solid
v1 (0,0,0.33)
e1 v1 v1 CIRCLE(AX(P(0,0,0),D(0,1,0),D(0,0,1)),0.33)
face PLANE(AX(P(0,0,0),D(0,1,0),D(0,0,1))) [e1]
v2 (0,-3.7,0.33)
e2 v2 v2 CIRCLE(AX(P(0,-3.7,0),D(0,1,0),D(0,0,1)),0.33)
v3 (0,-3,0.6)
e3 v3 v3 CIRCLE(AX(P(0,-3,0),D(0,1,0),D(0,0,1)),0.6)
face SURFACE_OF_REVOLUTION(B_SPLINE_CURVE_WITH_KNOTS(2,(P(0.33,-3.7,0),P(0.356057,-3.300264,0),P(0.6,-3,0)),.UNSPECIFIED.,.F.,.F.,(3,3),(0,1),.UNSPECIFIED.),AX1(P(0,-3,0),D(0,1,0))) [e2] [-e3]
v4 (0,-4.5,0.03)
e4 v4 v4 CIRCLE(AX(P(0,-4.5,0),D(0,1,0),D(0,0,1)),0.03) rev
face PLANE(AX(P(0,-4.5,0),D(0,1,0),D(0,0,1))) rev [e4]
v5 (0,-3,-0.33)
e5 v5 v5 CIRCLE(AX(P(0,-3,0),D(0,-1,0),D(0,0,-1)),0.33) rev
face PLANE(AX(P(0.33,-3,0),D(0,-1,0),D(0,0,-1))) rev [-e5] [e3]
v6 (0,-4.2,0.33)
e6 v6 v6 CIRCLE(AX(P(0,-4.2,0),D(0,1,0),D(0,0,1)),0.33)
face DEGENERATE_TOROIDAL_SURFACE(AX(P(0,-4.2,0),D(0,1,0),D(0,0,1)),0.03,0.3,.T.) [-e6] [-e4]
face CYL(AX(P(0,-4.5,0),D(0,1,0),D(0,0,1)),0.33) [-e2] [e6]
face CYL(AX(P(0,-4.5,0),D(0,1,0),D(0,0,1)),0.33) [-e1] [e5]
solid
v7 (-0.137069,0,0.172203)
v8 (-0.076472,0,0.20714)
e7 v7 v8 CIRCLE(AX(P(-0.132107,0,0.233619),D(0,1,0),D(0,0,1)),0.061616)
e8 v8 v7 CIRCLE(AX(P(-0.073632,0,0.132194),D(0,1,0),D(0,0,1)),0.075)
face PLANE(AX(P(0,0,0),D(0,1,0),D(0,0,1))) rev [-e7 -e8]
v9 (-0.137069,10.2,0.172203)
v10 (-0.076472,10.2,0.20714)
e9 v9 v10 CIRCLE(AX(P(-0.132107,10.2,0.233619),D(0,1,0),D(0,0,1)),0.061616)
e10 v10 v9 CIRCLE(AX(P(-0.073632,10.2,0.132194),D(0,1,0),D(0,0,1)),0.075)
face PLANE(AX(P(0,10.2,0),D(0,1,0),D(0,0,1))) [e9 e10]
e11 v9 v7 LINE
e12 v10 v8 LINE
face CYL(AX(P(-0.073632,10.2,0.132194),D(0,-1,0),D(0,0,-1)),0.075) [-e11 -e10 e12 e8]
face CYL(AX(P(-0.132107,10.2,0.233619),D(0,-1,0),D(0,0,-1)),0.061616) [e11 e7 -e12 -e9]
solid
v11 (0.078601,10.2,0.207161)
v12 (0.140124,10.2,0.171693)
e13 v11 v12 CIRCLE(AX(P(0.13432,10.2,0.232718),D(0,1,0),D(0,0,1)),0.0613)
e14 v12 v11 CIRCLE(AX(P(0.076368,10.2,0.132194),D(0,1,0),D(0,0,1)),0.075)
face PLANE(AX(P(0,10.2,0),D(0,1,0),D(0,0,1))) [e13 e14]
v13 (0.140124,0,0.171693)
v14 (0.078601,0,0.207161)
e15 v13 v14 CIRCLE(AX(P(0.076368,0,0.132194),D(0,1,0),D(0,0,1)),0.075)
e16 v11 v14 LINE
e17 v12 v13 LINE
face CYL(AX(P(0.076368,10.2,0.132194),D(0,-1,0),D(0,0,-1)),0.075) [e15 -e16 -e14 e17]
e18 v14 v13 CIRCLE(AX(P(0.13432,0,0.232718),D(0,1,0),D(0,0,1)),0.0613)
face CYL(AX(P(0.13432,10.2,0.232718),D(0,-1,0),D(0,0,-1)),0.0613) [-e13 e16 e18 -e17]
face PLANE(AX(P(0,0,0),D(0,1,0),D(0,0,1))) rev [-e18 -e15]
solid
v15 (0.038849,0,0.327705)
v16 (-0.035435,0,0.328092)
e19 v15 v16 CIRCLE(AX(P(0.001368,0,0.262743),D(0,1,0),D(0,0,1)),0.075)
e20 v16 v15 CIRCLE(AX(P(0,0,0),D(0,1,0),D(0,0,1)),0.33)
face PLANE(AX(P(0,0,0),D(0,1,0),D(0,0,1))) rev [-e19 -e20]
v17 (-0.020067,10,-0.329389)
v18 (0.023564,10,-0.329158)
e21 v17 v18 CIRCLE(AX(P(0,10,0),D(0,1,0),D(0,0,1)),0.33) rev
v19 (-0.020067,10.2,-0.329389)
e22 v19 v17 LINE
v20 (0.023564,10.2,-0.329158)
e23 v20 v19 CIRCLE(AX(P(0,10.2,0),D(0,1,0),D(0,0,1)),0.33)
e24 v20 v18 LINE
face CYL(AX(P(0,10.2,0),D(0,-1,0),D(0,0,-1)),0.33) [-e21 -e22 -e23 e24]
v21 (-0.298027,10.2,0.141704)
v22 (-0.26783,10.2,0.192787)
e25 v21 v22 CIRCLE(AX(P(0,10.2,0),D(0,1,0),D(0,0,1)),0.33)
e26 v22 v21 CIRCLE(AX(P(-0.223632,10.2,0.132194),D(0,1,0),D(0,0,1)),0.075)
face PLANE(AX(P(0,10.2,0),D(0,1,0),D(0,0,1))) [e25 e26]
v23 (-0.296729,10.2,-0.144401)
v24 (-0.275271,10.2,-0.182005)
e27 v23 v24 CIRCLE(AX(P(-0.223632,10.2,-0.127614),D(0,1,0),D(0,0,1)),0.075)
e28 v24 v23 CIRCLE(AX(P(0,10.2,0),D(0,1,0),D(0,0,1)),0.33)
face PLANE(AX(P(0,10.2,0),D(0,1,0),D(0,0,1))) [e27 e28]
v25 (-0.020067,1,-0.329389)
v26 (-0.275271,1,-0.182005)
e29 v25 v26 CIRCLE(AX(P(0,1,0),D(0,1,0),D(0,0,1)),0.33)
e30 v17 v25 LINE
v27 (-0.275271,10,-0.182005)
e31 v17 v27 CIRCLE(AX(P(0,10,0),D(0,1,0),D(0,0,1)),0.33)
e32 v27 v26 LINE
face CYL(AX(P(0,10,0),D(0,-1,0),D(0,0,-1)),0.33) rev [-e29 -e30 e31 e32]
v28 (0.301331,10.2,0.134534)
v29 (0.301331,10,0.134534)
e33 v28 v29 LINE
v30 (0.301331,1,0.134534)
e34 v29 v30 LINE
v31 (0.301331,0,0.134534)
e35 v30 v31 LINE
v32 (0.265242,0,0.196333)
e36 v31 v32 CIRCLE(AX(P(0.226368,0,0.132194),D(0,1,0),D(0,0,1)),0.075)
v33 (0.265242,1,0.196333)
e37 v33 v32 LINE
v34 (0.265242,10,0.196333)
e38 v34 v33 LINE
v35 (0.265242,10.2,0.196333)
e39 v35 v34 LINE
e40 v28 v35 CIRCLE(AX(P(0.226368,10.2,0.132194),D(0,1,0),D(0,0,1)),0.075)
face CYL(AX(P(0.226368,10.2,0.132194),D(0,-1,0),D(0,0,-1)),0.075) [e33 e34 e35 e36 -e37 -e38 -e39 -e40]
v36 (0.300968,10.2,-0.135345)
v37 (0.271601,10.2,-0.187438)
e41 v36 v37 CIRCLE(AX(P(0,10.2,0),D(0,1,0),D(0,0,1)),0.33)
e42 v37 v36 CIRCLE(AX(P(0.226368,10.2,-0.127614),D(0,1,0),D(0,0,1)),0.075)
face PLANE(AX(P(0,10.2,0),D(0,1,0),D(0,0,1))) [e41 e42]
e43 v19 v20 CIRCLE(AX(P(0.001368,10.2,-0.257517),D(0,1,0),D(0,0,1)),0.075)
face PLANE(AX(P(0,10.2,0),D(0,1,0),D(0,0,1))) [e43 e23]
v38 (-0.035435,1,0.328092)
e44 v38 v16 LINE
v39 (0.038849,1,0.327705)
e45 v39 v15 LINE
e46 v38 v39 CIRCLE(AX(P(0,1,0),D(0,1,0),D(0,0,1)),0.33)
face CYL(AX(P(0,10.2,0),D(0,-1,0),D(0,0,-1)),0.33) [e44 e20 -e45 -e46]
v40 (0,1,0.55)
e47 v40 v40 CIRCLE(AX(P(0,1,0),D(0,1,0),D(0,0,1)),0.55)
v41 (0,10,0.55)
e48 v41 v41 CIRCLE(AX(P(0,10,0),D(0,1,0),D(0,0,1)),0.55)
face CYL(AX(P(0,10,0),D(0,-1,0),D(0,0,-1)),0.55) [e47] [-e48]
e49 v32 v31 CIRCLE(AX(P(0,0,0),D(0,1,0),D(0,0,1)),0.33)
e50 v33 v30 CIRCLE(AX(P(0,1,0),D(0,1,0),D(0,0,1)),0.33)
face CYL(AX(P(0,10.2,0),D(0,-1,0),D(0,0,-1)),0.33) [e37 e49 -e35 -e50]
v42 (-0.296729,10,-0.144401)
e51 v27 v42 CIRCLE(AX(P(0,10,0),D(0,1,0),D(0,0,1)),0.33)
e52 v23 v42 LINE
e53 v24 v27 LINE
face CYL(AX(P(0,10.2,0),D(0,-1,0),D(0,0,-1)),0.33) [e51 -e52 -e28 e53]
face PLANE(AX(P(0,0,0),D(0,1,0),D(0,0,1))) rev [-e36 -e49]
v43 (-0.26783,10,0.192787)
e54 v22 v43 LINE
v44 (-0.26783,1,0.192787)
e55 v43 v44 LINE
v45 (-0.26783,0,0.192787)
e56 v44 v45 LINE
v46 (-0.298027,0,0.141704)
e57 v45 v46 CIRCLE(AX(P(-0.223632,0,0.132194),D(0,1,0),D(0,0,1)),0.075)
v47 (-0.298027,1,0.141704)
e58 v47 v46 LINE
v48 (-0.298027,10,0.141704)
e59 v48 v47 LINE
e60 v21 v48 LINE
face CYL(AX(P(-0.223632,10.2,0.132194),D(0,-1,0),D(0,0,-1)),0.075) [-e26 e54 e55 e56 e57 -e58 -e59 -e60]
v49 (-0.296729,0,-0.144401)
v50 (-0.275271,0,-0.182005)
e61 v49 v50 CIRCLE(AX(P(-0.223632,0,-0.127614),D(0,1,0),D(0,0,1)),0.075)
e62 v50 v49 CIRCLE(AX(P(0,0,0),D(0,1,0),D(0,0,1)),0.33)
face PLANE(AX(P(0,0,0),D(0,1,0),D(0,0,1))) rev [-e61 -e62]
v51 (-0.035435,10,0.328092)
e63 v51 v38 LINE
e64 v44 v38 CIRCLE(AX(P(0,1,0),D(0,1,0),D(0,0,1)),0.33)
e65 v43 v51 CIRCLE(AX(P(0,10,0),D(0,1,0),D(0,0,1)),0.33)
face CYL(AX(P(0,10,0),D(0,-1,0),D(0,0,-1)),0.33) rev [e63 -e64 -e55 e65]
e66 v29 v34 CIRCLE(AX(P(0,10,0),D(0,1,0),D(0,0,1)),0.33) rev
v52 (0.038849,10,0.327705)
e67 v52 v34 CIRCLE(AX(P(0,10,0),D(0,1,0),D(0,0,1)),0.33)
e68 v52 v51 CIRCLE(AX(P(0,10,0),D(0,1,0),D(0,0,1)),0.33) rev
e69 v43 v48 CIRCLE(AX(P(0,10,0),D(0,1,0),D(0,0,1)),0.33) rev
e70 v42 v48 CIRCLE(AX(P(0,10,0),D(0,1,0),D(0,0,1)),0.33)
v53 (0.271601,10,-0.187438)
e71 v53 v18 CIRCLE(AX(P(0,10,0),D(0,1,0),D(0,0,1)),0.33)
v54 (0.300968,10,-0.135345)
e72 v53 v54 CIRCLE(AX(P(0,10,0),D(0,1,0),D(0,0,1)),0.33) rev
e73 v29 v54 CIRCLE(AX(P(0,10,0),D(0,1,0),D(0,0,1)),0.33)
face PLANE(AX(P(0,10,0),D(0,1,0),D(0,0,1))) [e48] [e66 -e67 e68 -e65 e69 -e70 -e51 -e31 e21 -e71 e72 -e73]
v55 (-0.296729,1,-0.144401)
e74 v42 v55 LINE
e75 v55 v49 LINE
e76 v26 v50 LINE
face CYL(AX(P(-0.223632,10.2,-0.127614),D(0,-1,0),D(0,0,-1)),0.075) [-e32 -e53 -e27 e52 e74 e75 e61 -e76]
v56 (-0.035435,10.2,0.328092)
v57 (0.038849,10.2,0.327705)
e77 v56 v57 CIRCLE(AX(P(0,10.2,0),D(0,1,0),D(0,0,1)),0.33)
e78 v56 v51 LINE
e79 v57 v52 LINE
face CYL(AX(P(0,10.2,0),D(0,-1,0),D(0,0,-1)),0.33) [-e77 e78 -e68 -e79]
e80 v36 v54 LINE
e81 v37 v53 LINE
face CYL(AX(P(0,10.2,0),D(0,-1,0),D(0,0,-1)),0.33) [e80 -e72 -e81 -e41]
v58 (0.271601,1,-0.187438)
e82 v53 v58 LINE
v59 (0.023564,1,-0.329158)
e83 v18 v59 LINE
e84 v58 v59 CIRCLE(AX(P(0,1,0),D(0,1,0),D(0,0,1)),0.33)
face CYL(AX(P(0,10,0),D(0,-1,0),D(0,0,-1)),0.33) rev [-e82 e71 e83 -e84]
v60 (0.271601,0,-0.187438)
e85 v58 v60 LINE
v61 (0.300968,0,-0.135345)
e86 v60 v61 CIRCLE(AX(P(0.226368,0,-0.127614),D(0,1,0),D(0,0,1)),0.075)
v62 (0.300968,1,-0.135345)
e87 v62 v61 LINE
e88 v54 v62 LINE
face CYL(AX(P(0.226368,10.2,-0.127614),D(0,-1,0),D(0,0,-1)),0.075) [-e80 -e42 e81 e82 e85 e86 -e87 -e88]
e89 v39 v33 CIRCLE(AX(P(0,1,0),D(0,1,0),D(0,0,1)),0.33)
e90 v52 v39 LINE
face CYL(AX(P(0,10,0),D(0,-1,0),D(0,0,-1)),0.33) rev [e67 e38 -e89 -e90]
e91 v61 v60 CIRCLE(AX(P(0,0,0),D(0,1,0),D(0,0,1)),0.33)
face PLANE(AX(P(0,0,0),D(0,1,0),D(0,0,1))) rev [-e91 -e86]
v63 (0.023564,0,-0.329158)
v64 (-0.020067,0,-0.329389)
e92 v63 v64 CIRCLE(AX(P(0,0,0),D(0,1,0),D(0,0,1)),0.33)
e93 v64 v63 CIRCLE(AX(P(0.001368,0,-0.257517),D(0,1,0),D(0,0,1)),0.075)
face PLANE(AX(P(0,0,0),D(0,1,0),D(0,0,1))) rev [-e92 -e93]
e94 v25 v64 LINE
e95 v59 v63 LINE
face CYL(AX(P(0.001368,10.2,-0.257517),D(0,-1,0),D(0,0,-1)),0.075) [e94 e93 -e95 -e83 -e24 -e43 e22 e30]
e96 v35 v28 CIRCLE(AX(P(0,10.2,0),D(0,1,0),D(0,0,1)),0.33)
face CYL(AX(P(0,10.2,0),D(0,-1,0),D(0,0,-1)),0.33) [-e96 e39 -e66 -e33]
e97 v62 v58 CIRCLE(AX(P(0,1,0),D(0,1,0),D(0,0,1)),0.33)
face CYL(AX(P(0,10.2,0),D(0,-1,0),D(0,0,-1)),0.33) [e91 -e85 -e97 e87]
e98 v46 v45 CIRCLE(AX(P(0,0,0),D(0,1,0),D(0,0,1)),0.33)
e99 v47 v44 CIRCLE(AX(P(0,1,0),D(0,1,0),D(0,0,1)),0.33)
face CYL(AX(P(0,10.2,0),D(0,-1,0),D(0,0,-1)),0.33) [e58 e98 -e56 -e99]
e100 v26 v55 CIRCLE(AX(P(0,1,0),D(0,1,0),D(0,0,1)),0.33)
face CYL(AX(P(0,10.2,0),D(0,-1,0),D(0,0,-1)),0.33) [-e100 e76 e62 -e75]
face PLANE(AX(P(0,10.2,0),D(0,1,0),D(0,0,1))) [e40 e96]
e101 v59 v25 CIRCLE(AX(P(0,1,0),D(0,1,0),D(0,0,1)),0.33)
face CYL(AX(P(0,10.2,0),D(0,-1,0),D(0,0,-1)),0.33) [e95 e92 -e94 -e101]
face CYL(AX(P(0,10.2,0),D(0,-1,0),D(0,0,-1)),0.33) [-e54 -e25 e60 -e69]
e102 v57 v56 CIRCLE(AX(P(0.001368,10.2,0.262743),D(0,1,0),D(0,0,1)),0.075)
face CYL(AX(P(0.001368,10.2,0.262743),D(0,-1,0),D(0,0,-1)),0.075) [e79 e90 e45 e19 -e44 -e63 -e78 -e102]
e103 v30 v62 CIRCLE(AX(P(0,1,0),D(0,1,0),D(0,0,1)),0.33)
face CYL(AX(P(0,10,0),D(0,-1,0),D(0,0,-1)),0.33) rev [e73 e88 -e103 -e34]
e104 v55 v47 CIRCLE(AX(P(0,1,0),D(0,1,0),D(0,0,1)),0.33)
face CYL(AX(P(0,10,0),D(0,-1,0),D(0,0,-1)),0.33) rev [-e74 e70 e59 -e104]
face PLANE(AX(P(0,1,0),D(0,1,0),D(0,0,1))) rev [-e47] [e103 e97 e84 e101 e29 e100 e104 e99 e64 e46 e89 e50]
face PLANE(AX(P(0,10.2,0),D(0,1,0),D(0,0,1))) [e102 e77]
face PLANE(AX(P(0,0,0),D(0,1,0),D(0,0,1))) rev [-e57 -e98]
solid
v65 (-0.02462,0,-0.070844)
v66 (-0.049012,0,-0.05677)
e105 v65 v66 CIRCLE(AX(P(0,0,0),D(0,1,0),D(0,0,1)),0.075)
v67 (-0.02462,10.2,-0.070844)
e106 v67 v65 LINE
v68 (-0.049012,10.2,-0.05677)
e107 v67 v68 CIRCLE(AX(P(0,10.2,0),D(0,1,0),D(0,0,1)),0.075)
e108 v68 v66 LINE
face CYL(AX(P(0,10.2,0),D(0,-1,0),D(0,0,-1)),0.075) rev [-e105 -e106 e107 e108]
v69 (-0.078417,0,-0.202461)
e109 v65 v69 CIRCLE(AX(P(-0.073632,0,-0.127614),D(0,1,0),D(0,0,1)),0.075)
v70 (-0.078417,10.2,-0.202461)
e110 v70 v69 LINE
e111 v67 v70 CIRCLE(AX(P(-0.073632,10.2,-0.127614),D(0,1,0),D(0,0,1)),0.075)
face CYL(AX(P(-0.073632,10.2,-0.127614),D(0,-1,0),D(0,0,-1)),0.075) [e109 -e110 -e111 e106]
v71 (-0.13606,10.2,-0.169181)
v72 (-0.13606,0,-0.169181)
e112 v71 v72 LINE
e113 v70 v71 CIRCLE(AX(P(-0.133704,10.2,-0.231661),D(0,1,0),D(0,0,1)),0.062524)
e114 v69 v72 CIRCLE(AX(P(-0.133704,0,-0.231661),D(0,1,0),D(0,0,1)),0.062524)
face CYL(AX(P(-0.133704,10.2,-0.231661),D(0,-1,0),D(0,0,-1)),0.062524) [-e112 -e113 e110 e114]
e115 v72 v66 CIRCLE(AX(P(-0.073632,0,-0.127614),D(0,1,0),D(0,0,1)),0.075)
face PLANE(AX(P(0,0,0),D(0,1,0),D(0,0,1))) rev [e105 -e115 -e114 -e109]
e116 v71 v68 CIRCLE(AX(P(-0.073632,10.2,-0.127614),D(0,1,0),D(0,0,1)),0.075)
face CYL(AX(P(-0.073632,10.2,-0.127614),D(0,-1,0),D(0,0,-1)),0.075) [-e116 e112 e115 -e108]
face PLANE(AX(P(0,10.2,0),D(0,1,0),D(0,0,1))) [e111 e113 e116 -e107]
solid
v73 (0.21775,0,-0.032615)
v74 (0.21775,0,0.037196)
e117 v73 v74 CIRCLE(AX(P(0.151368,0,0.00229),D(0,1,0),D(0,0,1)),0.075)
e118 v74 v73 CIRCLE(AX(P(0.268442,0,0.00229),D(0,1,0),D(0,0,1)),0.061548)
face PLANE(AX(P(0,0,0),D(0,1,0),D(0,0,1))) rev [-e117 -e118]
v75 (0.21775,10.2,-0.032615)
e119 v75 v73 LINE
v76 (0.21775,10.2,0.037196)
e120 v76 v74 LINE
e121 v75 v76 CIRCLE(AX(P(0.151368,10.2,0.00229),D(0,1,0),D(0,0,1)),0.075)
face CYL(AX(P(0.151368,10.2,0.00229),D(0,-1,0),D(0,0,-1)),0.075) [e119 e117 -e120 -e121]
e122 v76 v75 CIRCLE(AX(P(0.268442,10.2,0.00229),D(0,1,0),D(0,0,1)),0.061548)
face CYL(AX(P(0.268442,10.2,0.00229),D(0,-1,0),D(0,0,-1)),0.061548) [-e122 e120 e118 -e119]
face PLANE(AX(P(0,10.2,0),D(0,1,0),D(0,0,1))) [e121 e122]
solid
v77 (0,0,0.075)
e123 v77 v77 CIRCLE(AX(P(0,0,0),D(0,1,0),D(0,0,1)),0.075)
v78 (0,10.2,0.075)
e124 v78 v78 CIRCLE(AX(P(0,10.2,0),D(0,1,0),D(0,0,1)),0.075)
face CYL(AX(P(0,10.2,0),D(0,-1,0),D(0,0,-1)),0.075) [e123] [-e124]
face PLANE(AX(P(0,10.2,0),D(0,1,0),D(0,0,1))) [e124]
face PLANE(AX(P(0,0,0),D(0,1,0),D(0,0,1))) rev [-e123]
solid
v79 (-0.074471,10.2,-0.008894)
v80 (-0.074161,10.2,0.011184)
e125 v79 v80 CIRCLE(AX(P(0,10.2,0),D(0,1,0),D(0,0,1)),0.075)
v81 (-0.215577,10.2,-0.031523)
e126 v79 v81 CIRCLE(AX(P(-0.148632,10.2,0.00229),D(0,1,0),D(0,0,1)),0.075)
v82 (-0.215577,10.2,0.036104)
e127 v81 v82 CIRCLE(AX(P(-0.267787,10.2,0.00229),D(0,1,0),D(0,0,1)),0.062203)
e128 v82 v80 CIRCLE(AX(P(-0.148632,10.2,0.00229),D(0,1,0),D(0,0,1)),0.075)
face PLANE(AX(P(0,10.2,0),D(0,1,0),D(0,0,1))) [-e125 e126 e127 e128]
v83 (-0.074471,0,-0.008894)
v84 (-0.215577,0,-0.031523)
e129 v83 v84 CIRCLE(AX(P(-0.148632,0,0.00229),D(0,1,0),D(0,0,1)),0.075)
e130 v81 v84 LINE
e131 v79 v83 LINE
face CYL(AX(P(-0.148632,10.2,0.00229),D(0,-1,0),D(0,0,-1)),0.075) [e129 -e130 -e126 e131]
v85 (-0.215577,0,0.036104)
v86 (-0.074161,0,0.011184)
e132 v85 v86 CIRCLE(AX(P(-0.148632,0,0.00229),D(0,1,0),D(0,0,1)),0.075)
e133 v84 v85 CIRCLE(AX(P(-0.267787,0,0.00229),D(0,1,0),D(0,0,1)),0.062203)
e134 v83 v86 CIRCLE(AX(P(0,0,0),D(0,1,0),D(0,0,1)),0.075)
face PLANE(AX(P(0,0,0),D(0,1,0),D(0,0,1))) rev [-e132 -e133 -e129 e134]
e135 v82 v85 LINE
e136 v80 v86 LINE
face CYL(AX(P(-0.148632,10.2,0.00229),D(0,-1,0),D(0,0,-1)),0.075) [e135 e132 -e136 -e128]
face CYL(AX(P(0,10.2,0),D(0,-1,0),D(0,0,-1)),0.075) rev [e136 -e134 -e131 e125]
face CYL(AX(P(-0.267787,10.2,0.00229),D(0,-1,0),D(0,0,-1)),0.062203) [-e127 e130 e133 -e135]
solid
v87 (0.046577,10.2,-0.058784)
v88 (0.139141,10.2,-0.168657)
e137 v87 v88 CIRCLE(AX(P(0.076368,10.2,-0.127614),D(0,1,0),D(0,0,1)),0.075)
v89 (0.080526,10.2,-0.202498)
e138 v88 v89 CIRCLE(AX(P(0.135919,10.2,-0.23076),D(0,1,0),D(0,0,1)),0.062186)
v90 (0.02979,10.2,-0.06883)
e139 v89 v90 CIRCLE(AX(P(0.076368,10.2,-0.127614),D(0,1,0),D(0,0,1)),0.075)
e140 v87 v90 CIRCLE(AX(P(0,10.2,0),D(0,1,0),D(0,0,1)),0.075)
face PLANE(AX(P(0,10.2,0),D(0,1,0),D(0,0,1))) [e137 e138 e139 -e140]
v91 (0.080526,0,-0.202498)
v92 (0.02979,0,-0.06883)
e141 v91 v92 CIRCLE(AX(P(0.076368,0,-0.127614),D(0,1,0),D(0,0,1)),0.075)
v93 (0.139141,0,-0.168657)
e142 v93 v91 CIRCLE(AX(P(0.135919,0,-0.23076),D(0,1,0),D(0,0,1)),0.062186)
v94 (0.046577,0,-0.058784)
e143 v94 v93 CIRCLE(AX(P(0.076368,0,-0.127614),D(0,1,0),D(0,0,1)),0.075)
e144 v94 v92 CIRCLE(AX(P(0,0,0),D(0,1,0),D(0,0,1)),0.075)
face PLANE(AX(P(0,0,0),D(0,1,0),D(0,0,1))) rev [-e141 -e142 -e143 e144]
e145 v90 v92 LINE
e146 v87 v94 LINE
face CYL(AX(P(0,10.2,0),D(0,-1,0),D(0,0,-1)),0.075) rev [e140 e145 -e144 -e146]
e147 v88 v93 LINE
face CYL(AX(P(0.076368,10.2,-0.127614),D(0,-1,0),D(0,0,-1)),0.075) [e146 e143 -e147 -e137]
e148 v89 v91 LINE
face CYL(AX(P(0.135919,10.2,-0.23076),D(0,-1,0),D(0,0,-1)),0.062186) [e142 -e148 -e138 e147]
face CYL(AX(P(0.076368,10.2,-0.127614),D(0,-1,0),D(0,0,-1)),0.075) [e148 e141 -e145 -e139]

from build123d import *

# Parameters (mm, degrees)
EXTRUDE_2_OUTLINE_R = 0.075
EXTRUDE_2_DEPTH     = 10.2
EXTRUDE_2_2_DEPTH   = 10.2
EXTRUDE_2_3_DEPTH   = 10.2
EXTRUDE_2_4_DEPTH   = 10.2
EXTRUDE_2_5_DEPTH   = 10.2
EXTRUDE_2_6_DEPTH   = 10.2
EXTRUDE_2_7_DEPTH   = 10.2
EXTRUDE_2_8_DEPTH   = 10.2
EXTRUDE_2_9_DEPTH   = 10.2
EXTRUDE_2_10_DEPTH  = 10.2
EXTRUDE_2_11_DEPTH  = 10.2
EXTRUDE_2_12_DEPTH  = 10.2
EXTRUDE_2_13_DEPTH  = 10.2
EXTRUDE_5_DEPTH     = 4.5
EXTRUDE_START       = 1
SKETCH_3_R          = 0.55
SKETCH_3_R_2        = 0.33
EXTRUDE_6_DEPTH     = 9
FILLET_3_R          = 0.3


# Read off the part's stored shape, not the designer's step: Бобышка-Вытянуть2
with BuildPart() as part:
    # Бобышка-Вытянуть2 outline → Бобышка-Вытянуть2 (new body)
    with BuildSketch(Plane(origin=(0, 0, 0), x_dir=(1, 0, 0), z_dir=(0, 1, 0))):
        Circle(EXTRUDE_2_OUTLINE_R)
    extrude(amount=EXTRUDE_2_DEPTH)


with BuildPart() as body_2:
    # Extrude 2 2 outline → Extrude 2 2 (new body)
    with BuildSketch(Plane(origin=(0, 0, 0), x_dir=(1, 0, 0), z_dir=(0, 1, 0))):
        with BuildLine():
            ThreePointArc((-0.215577435, 0.031523255), (-0.329990207, -0.00229018), (-0.215577435, -0.036103616))
            ThreePointArc((-0.215577435, -0.036103616), (-0.135616584, -0.076152155), (-0.074161469, -0.011183762))
            ThreePointArc((-0.074161469, -0.011183762), (-0.074991098, -0.00115549), (-0.074470828, 0.008893581))
            ThreePointArc((-0.074470828, 0.008893581), (-0.136756085, 0.071763554), (-0.215577435, 0.031523255))
        make_face()
    extrude(amount=EXTRUDE_2_2_DEPTH)



with BuildPart() as body_3:
    # Extrude 2 3 outline → Extrude 2 3 (new body)
    with BuildSketch(Plane(origin=(0, 0, 0), x_dir=(1, 0, 0), z_dir=(0, 1, 0))):
        with BuildLine():
            ThreePointArc((-0.078416857, 0.202460861), (-0.164965898, 0.285808068), (-0.13605962, 0.169180796))
            ThreePointArc((-0.13605962, 0.169180796), (-0.132931564, 0.081694169), (-0.049012134, 0.056769805))
            ThreePointArc((-0.049012134, 0.056769805), (-0.03748264, 0.064961925), (-0.024620163, 0.070843825))
            ThreePointArc((-0.024620163, 0.070843825), (-0.004207657, 0.155990018), (-0.078416857, 0.202460861))
        make_face()
    extrude(amount=EXTRUDE_2_3_DEPTH)


with BuildPart() as body_4:
    # Extrude 2 4 outline → Extrude 2 4 (new body)
    with BuildSketch(Plane(origin=(0, 0, 0), x_dir=(1, 0, 0), z_dir=(0, 1, 0))):
        with BuildLine():
            ThreePointArc((0.139140572, 0.168657106), (0.167012389, 0.284614831), (0.080525962, 0.202498267))
            ThreePointArc((0.080525962, 0.202498267), (0.006248792, 0.154228257), (0.029790206, 0.068829817))
            ThreePointArc((0.029790206, 0.068829817), (0.038512817, 0.06435653), (0.046577497, 0.058783813))
            ThreePointArc((0.046577497, 0.058783813), (0.133726217, 0.079291783), (0.139140572, 0.168657106))
        make_face()
    extrude(amount=EXTRUDE_2_4_DEPTH)


with BuildPart() as body_5:
    # Extrude 2 5 outline → Extrude 2 5 (new body)
    with BuildSketch(Plane(origin=(0, 0, 0), x_dir=(1, 0, 0), z_dir=(0, 1, 0))):
        with BuildLine():
            ThreePointArc((0.217749972, -0.037195687), (0.329990231, -0.002290181), (0.217749972, 0.032615326))
            ThreePointArc((0.217749972, 0.032615326), (0.076367703, -0.00229018), (0.217749972, -0.037195687))
        make_face()
    extrude(amount=EXTRUDE_2_5_DEPTH)


with BuildPart() as body_6:
    # Extrude 2 6 outline → Extrude 2 6 (new body)
    with BuildSketch(Plane(origin=(0, 0, 0), x_dir=(1, 0, 0), z_dir=(0, 1, 0))):
        with BuildLine():
            ThreePointArc((0.078601287, -0.207160724), (0.164936529, -0.285825011), (0.140123873, -0.171692736))
            ThreePointArc((0.140123873, -0.171692736), (0.038908974, -0.067218275), (0.078601287, -0.207160724))
        make_face()
    extrude(amount=EXTRUDE_2_6_DEPTH)


with BuildPart() as body_7:
    # Extrude 2 7 outline → Extrude 2 7 (new body)
    with BuildSketch(Plane(origin=(0, 0, 0), x_dir=(1, 0, 0), z_dir=(0, 1, 0))):
        with BuildLine():
            ThreePointArc((-0.137069196, -0.172203487), (-0.162882691, -0.286998397), (-0.076471576, -0.207140228))
            ThreePointArc((-0.076471576, -0.207140228), (-0.036171958, -0.067219203), (-0.137069196, -0.172203487))
        make_face()
    extrude(amount=EXTRUDE_2_7_DEPTH)


with BuildPart() as body_8:
    # Extrude 2 8 outline → Extrude 2 8 (new body)
    with BuildSketch(Plane(origin=(0, 0, 0), x_dir=(1, 0, 0), z_dir=(0, 1, 0))):
        with BuildLine():
            ThreePointArc((-0.296729349, 0.144401155), (-0.158491958, 0.090441918), (-0.275270897, 0.182005311))
            ThreePointArc((-0.275270897, 0.182005311), (-0.286617495, 0.163555531), (-0.296729349, 0.144401155))
        make_face()
    extrude(amount=EXTRUDE_2_8_DEPTH)


with BuildPart() as body_9:
    # Extrude 2 9 outline → Extrude 2 9 (new body)
    with BuildSketch(Plane(origin=(0, 0, 0), x_dir=(1, 0, 0), z_dir=(0, 1, 0))):
        with BuildLine():
            ThreePointArc((-0.267830407, -0.192787118), (-0.159068831, -0.0940291), (-0.29802696, -0.141703673))
            ThreePointArc((-0.29802696, -0.141703673), (-0.284079249, -0.16792552), (-0.267830407, -0.192787118))
        make_face()
    extrude(amount=EXTRUDE_2_9_DEPTH)


with BuildPart() as body_10:
    # Extrude 2 10 outline → Extrude 2 10 (new body)
    with BuildSketch(Plane(origin=(0, 0, 0), x_dir=(1, 0, 0), z_dir=(0, 1, 0))):
        with BuildLine():
            ThreePointArc((-0.020066658, 0.329389328), (0.000969374, 0.182518498), (0.023564272, 0.329157599))
            ThreePointArc((0.023564272, 0.329157599), (0.001752641, 0.329995346), (-0.020066658, 0.329389328))
        make_face()
    extrude(amount=EXTRUDE_2_10_DEPTH)


with BuildPart() as body_11:
    # Extrude 2 11 outline → Extrude 2 11 (new body)
    with BuildSketch(Plane(origin=(0, 0, 0), x_dir=(1, 0, 0), z_dir=(0, 1, 0))):
        with BuildLine():
            ThreePointArc((0.038848965, -0.327705291), (0.000977296, -0.187743587), (-0.03543522, -0.328091977))
            ThreePointArc((-0.03543522, -0.328091977), (0.001717788, -0.329995529), (0.038848965, -0.327705291))
        make_face()
    extrude(amount=EXTRUDE_2_11_DEPTH)


with BuildPart() as body_12:
    # Extrude 2 12 outline → Extrude 2 12 (new body)
    with BuildSketch(Plane(origin=(0, 0, 0), x_dir=(1, 0, 0), z_dir=(0, 1, 0))):
        with BuildLine():
            ThreePointArc((0.301331175, -0.134534467), (0.161602494, -0.094372467), (0.265242363, -0.196332597))
            ThreePointArc((0.265242363, -0.196332597), (0.284966921, -0.166414705), (0.301331175, -0.134534467))
        make_face()
    extrude(amount=EXTRUDE_2_12_DEPTH)


with BuildPart() as body_13:
    # Extrude 2 13 outline → Extrude 2 13 (new body)
    with BuildSketch(Plane(origin=(0, 0, 0), x_dir=(1, 0, 0), z_dir=(0, 1, 0))):
        with BuildLine():
            ThreePointArc((0.271600665, 0.1874382), (0.16103432, 0.090782272), (0.300968191, 0.135344552))
            ThreePointArc((0.300968191, 0.135344552), (0.287466887, 0.162057981), (0.271600665, 0.1874382))
        make_face()
    extrude(amount=EXTRUDE_2_13_DEPTH)


with BuildPart() as body_14:
    # Эскиз2 → Бобышка-Вытянуть5 (new body)
    with BuildSketch(Plane(origin=(0, 0, 0), x_dir=(1, 0, 0), z_dir=(0, 1, 0))):
        with BuildLine():
            ThreePointArc((-0.020066658, 0.329389328), (-0.165035087, 0.285768123), (-0.275270897, 0.182005311))
            ThreePointArc((-0.275270897, 0.182005311), (-0.286617495, 0.163555531), (-0.296729349, 0.144401155))
            ThreePointArc((-0.296729349, 0.144401155), (-0.329996606, 0.00149668), (-0.29802696, -0.141703673))
            ThreePointArc((-0.29802696, -0.141703673), (-0.284079249, -0.16792552), (-0.267830407, -0.192787118))
            ThreePointArc((-0.267830407, -0.192787118), (-0.166040241, -0.285185271), (-0.03543522, -0.328091977))
            ThreePointArc((-0.03543522, -0.328091977), (0.001717788, -0.329995529), (0.038848965, -0.327705291))
            ThreePointArc((0.038848965, -0.327705291), (0.165627836, -0.285424981), (0.265242363, -0.196332597))
            ThreePointArc((0.265242363, -0.196332597), (0.284966921, -0.166414705), (0.301331175, -0.134534467))
            ThreePointArc((0.301331175, -0.134534467), (0.322753225, -0.068777584), (0.33, 0))
            ThreePointArc((0.33, 0), (0.322660428, 0.069211621), (0.300968191, 0.135344552))
            ThreePointArc((0.300968191, 0.135344552), (0.287466887, 0.162057981), (0.271600665, 0.1874382))
            ThreePointArc((0.271600665, 0.1874382), (0.163712193, 0.28652804), (0.023564272, 0.329157599))
            ThreePointArc((0.023564272, 0.329157599), (0.001752641, 0.329995346), (-0.020066658, 0.329389328))
        make_face()
    extrude(amount=-EXTRUDE_5_DEPTH)

    # Эскиз5 → Повернуть1 (revolve)
    with BuildSketch(Plane(origin=(0, 0, 0), x_dir=(-1, 0, 0), z_dir=(0, 0, 1)), mode=Mode.PRIVATE) as revolve_1_sk:
        with BuildLine():
            Line((-0.33, 3), (-0.6, 3))
            add(Edge.make_bspline(
                [(-0.33, 3.7), (-0.356057392, 3.300263602), (-0.6, 3)],
                knots=[0, 0, 0, 1, 1, 1], degree=2))
            Line((-0.33, 3.7), (0, 3.7))
            Line((0, 3.7), (0, 3))
            Line((0, 3), (-0.33, 3))
        make_face()
    revolve(revolve_1_sk.sketch.rotate(Axis((0, -3, 0), (0, -1, 0)), 90), axis=Axis((0, -3, 0), (0, -1, 0)))

    # Скругление3
    fillet_3_edges = [body_14.edges().sort_by_distance(p)[0] for p in [
        (0.29802696, -4.5, -0.141703673),
    ]]
    fillet(fillet_3_edges, radius=FILLET_3_R)


with BuildPart() as body_2_1:
    add(body_2.part)

    add(body_3.part)  # Бобышка-Вытянуть6 merges body 3

    add(body_4.part)  # Бобышка-Вытянуть6 merges body 4

    add(body_5.part)  # Бобышка-Вытянуть6 merges body 5

    add(body_6.part)  # Бобышка-Вытянуть6 merges body 6

    add(body_7.part)  # Бобышка-Вытянуть6 merges body 7

    add(body_8.part)  # Бобышка-Вытянуть6 merges body 8

    add(body_9.part)  # Бобышка-Вытянуть6 merges body 9

    add(body_10.part)  # Бобышка-Вытянуть6 merges body 10

    add(body_11.part)  # Бобышка-Вытянуть6 merges body 11

    add(body_12.part)  # Бобышка-Вытянуть6 merges body 12

    add(body_13.part)  # Бобышка-Вытянуть6 merges body 13
    # Эскиз3 → Бобышка-Вытянуть6 (add)
    with BuildSketch(Plane(origin=(0, 0, 0), x_dir=(1, 0, 0), z_dir=(0, 1, 0)).offset(EXTRUDE_START)):
        with Locations(Location((0, 0, 0), (0, 0, 270))):
            Circle(SKETCH_3_R)
        with Locations(Location((0, 0, 0), (0, 0, 270))):
            Circle(SKETCH_3_R_2, mode=Mode.SUBTRACT)
    extrude(amount=EXTRUDE_6_DEPTH)


solid = Compound([part.part, body_14.part, body_2_1.part])
